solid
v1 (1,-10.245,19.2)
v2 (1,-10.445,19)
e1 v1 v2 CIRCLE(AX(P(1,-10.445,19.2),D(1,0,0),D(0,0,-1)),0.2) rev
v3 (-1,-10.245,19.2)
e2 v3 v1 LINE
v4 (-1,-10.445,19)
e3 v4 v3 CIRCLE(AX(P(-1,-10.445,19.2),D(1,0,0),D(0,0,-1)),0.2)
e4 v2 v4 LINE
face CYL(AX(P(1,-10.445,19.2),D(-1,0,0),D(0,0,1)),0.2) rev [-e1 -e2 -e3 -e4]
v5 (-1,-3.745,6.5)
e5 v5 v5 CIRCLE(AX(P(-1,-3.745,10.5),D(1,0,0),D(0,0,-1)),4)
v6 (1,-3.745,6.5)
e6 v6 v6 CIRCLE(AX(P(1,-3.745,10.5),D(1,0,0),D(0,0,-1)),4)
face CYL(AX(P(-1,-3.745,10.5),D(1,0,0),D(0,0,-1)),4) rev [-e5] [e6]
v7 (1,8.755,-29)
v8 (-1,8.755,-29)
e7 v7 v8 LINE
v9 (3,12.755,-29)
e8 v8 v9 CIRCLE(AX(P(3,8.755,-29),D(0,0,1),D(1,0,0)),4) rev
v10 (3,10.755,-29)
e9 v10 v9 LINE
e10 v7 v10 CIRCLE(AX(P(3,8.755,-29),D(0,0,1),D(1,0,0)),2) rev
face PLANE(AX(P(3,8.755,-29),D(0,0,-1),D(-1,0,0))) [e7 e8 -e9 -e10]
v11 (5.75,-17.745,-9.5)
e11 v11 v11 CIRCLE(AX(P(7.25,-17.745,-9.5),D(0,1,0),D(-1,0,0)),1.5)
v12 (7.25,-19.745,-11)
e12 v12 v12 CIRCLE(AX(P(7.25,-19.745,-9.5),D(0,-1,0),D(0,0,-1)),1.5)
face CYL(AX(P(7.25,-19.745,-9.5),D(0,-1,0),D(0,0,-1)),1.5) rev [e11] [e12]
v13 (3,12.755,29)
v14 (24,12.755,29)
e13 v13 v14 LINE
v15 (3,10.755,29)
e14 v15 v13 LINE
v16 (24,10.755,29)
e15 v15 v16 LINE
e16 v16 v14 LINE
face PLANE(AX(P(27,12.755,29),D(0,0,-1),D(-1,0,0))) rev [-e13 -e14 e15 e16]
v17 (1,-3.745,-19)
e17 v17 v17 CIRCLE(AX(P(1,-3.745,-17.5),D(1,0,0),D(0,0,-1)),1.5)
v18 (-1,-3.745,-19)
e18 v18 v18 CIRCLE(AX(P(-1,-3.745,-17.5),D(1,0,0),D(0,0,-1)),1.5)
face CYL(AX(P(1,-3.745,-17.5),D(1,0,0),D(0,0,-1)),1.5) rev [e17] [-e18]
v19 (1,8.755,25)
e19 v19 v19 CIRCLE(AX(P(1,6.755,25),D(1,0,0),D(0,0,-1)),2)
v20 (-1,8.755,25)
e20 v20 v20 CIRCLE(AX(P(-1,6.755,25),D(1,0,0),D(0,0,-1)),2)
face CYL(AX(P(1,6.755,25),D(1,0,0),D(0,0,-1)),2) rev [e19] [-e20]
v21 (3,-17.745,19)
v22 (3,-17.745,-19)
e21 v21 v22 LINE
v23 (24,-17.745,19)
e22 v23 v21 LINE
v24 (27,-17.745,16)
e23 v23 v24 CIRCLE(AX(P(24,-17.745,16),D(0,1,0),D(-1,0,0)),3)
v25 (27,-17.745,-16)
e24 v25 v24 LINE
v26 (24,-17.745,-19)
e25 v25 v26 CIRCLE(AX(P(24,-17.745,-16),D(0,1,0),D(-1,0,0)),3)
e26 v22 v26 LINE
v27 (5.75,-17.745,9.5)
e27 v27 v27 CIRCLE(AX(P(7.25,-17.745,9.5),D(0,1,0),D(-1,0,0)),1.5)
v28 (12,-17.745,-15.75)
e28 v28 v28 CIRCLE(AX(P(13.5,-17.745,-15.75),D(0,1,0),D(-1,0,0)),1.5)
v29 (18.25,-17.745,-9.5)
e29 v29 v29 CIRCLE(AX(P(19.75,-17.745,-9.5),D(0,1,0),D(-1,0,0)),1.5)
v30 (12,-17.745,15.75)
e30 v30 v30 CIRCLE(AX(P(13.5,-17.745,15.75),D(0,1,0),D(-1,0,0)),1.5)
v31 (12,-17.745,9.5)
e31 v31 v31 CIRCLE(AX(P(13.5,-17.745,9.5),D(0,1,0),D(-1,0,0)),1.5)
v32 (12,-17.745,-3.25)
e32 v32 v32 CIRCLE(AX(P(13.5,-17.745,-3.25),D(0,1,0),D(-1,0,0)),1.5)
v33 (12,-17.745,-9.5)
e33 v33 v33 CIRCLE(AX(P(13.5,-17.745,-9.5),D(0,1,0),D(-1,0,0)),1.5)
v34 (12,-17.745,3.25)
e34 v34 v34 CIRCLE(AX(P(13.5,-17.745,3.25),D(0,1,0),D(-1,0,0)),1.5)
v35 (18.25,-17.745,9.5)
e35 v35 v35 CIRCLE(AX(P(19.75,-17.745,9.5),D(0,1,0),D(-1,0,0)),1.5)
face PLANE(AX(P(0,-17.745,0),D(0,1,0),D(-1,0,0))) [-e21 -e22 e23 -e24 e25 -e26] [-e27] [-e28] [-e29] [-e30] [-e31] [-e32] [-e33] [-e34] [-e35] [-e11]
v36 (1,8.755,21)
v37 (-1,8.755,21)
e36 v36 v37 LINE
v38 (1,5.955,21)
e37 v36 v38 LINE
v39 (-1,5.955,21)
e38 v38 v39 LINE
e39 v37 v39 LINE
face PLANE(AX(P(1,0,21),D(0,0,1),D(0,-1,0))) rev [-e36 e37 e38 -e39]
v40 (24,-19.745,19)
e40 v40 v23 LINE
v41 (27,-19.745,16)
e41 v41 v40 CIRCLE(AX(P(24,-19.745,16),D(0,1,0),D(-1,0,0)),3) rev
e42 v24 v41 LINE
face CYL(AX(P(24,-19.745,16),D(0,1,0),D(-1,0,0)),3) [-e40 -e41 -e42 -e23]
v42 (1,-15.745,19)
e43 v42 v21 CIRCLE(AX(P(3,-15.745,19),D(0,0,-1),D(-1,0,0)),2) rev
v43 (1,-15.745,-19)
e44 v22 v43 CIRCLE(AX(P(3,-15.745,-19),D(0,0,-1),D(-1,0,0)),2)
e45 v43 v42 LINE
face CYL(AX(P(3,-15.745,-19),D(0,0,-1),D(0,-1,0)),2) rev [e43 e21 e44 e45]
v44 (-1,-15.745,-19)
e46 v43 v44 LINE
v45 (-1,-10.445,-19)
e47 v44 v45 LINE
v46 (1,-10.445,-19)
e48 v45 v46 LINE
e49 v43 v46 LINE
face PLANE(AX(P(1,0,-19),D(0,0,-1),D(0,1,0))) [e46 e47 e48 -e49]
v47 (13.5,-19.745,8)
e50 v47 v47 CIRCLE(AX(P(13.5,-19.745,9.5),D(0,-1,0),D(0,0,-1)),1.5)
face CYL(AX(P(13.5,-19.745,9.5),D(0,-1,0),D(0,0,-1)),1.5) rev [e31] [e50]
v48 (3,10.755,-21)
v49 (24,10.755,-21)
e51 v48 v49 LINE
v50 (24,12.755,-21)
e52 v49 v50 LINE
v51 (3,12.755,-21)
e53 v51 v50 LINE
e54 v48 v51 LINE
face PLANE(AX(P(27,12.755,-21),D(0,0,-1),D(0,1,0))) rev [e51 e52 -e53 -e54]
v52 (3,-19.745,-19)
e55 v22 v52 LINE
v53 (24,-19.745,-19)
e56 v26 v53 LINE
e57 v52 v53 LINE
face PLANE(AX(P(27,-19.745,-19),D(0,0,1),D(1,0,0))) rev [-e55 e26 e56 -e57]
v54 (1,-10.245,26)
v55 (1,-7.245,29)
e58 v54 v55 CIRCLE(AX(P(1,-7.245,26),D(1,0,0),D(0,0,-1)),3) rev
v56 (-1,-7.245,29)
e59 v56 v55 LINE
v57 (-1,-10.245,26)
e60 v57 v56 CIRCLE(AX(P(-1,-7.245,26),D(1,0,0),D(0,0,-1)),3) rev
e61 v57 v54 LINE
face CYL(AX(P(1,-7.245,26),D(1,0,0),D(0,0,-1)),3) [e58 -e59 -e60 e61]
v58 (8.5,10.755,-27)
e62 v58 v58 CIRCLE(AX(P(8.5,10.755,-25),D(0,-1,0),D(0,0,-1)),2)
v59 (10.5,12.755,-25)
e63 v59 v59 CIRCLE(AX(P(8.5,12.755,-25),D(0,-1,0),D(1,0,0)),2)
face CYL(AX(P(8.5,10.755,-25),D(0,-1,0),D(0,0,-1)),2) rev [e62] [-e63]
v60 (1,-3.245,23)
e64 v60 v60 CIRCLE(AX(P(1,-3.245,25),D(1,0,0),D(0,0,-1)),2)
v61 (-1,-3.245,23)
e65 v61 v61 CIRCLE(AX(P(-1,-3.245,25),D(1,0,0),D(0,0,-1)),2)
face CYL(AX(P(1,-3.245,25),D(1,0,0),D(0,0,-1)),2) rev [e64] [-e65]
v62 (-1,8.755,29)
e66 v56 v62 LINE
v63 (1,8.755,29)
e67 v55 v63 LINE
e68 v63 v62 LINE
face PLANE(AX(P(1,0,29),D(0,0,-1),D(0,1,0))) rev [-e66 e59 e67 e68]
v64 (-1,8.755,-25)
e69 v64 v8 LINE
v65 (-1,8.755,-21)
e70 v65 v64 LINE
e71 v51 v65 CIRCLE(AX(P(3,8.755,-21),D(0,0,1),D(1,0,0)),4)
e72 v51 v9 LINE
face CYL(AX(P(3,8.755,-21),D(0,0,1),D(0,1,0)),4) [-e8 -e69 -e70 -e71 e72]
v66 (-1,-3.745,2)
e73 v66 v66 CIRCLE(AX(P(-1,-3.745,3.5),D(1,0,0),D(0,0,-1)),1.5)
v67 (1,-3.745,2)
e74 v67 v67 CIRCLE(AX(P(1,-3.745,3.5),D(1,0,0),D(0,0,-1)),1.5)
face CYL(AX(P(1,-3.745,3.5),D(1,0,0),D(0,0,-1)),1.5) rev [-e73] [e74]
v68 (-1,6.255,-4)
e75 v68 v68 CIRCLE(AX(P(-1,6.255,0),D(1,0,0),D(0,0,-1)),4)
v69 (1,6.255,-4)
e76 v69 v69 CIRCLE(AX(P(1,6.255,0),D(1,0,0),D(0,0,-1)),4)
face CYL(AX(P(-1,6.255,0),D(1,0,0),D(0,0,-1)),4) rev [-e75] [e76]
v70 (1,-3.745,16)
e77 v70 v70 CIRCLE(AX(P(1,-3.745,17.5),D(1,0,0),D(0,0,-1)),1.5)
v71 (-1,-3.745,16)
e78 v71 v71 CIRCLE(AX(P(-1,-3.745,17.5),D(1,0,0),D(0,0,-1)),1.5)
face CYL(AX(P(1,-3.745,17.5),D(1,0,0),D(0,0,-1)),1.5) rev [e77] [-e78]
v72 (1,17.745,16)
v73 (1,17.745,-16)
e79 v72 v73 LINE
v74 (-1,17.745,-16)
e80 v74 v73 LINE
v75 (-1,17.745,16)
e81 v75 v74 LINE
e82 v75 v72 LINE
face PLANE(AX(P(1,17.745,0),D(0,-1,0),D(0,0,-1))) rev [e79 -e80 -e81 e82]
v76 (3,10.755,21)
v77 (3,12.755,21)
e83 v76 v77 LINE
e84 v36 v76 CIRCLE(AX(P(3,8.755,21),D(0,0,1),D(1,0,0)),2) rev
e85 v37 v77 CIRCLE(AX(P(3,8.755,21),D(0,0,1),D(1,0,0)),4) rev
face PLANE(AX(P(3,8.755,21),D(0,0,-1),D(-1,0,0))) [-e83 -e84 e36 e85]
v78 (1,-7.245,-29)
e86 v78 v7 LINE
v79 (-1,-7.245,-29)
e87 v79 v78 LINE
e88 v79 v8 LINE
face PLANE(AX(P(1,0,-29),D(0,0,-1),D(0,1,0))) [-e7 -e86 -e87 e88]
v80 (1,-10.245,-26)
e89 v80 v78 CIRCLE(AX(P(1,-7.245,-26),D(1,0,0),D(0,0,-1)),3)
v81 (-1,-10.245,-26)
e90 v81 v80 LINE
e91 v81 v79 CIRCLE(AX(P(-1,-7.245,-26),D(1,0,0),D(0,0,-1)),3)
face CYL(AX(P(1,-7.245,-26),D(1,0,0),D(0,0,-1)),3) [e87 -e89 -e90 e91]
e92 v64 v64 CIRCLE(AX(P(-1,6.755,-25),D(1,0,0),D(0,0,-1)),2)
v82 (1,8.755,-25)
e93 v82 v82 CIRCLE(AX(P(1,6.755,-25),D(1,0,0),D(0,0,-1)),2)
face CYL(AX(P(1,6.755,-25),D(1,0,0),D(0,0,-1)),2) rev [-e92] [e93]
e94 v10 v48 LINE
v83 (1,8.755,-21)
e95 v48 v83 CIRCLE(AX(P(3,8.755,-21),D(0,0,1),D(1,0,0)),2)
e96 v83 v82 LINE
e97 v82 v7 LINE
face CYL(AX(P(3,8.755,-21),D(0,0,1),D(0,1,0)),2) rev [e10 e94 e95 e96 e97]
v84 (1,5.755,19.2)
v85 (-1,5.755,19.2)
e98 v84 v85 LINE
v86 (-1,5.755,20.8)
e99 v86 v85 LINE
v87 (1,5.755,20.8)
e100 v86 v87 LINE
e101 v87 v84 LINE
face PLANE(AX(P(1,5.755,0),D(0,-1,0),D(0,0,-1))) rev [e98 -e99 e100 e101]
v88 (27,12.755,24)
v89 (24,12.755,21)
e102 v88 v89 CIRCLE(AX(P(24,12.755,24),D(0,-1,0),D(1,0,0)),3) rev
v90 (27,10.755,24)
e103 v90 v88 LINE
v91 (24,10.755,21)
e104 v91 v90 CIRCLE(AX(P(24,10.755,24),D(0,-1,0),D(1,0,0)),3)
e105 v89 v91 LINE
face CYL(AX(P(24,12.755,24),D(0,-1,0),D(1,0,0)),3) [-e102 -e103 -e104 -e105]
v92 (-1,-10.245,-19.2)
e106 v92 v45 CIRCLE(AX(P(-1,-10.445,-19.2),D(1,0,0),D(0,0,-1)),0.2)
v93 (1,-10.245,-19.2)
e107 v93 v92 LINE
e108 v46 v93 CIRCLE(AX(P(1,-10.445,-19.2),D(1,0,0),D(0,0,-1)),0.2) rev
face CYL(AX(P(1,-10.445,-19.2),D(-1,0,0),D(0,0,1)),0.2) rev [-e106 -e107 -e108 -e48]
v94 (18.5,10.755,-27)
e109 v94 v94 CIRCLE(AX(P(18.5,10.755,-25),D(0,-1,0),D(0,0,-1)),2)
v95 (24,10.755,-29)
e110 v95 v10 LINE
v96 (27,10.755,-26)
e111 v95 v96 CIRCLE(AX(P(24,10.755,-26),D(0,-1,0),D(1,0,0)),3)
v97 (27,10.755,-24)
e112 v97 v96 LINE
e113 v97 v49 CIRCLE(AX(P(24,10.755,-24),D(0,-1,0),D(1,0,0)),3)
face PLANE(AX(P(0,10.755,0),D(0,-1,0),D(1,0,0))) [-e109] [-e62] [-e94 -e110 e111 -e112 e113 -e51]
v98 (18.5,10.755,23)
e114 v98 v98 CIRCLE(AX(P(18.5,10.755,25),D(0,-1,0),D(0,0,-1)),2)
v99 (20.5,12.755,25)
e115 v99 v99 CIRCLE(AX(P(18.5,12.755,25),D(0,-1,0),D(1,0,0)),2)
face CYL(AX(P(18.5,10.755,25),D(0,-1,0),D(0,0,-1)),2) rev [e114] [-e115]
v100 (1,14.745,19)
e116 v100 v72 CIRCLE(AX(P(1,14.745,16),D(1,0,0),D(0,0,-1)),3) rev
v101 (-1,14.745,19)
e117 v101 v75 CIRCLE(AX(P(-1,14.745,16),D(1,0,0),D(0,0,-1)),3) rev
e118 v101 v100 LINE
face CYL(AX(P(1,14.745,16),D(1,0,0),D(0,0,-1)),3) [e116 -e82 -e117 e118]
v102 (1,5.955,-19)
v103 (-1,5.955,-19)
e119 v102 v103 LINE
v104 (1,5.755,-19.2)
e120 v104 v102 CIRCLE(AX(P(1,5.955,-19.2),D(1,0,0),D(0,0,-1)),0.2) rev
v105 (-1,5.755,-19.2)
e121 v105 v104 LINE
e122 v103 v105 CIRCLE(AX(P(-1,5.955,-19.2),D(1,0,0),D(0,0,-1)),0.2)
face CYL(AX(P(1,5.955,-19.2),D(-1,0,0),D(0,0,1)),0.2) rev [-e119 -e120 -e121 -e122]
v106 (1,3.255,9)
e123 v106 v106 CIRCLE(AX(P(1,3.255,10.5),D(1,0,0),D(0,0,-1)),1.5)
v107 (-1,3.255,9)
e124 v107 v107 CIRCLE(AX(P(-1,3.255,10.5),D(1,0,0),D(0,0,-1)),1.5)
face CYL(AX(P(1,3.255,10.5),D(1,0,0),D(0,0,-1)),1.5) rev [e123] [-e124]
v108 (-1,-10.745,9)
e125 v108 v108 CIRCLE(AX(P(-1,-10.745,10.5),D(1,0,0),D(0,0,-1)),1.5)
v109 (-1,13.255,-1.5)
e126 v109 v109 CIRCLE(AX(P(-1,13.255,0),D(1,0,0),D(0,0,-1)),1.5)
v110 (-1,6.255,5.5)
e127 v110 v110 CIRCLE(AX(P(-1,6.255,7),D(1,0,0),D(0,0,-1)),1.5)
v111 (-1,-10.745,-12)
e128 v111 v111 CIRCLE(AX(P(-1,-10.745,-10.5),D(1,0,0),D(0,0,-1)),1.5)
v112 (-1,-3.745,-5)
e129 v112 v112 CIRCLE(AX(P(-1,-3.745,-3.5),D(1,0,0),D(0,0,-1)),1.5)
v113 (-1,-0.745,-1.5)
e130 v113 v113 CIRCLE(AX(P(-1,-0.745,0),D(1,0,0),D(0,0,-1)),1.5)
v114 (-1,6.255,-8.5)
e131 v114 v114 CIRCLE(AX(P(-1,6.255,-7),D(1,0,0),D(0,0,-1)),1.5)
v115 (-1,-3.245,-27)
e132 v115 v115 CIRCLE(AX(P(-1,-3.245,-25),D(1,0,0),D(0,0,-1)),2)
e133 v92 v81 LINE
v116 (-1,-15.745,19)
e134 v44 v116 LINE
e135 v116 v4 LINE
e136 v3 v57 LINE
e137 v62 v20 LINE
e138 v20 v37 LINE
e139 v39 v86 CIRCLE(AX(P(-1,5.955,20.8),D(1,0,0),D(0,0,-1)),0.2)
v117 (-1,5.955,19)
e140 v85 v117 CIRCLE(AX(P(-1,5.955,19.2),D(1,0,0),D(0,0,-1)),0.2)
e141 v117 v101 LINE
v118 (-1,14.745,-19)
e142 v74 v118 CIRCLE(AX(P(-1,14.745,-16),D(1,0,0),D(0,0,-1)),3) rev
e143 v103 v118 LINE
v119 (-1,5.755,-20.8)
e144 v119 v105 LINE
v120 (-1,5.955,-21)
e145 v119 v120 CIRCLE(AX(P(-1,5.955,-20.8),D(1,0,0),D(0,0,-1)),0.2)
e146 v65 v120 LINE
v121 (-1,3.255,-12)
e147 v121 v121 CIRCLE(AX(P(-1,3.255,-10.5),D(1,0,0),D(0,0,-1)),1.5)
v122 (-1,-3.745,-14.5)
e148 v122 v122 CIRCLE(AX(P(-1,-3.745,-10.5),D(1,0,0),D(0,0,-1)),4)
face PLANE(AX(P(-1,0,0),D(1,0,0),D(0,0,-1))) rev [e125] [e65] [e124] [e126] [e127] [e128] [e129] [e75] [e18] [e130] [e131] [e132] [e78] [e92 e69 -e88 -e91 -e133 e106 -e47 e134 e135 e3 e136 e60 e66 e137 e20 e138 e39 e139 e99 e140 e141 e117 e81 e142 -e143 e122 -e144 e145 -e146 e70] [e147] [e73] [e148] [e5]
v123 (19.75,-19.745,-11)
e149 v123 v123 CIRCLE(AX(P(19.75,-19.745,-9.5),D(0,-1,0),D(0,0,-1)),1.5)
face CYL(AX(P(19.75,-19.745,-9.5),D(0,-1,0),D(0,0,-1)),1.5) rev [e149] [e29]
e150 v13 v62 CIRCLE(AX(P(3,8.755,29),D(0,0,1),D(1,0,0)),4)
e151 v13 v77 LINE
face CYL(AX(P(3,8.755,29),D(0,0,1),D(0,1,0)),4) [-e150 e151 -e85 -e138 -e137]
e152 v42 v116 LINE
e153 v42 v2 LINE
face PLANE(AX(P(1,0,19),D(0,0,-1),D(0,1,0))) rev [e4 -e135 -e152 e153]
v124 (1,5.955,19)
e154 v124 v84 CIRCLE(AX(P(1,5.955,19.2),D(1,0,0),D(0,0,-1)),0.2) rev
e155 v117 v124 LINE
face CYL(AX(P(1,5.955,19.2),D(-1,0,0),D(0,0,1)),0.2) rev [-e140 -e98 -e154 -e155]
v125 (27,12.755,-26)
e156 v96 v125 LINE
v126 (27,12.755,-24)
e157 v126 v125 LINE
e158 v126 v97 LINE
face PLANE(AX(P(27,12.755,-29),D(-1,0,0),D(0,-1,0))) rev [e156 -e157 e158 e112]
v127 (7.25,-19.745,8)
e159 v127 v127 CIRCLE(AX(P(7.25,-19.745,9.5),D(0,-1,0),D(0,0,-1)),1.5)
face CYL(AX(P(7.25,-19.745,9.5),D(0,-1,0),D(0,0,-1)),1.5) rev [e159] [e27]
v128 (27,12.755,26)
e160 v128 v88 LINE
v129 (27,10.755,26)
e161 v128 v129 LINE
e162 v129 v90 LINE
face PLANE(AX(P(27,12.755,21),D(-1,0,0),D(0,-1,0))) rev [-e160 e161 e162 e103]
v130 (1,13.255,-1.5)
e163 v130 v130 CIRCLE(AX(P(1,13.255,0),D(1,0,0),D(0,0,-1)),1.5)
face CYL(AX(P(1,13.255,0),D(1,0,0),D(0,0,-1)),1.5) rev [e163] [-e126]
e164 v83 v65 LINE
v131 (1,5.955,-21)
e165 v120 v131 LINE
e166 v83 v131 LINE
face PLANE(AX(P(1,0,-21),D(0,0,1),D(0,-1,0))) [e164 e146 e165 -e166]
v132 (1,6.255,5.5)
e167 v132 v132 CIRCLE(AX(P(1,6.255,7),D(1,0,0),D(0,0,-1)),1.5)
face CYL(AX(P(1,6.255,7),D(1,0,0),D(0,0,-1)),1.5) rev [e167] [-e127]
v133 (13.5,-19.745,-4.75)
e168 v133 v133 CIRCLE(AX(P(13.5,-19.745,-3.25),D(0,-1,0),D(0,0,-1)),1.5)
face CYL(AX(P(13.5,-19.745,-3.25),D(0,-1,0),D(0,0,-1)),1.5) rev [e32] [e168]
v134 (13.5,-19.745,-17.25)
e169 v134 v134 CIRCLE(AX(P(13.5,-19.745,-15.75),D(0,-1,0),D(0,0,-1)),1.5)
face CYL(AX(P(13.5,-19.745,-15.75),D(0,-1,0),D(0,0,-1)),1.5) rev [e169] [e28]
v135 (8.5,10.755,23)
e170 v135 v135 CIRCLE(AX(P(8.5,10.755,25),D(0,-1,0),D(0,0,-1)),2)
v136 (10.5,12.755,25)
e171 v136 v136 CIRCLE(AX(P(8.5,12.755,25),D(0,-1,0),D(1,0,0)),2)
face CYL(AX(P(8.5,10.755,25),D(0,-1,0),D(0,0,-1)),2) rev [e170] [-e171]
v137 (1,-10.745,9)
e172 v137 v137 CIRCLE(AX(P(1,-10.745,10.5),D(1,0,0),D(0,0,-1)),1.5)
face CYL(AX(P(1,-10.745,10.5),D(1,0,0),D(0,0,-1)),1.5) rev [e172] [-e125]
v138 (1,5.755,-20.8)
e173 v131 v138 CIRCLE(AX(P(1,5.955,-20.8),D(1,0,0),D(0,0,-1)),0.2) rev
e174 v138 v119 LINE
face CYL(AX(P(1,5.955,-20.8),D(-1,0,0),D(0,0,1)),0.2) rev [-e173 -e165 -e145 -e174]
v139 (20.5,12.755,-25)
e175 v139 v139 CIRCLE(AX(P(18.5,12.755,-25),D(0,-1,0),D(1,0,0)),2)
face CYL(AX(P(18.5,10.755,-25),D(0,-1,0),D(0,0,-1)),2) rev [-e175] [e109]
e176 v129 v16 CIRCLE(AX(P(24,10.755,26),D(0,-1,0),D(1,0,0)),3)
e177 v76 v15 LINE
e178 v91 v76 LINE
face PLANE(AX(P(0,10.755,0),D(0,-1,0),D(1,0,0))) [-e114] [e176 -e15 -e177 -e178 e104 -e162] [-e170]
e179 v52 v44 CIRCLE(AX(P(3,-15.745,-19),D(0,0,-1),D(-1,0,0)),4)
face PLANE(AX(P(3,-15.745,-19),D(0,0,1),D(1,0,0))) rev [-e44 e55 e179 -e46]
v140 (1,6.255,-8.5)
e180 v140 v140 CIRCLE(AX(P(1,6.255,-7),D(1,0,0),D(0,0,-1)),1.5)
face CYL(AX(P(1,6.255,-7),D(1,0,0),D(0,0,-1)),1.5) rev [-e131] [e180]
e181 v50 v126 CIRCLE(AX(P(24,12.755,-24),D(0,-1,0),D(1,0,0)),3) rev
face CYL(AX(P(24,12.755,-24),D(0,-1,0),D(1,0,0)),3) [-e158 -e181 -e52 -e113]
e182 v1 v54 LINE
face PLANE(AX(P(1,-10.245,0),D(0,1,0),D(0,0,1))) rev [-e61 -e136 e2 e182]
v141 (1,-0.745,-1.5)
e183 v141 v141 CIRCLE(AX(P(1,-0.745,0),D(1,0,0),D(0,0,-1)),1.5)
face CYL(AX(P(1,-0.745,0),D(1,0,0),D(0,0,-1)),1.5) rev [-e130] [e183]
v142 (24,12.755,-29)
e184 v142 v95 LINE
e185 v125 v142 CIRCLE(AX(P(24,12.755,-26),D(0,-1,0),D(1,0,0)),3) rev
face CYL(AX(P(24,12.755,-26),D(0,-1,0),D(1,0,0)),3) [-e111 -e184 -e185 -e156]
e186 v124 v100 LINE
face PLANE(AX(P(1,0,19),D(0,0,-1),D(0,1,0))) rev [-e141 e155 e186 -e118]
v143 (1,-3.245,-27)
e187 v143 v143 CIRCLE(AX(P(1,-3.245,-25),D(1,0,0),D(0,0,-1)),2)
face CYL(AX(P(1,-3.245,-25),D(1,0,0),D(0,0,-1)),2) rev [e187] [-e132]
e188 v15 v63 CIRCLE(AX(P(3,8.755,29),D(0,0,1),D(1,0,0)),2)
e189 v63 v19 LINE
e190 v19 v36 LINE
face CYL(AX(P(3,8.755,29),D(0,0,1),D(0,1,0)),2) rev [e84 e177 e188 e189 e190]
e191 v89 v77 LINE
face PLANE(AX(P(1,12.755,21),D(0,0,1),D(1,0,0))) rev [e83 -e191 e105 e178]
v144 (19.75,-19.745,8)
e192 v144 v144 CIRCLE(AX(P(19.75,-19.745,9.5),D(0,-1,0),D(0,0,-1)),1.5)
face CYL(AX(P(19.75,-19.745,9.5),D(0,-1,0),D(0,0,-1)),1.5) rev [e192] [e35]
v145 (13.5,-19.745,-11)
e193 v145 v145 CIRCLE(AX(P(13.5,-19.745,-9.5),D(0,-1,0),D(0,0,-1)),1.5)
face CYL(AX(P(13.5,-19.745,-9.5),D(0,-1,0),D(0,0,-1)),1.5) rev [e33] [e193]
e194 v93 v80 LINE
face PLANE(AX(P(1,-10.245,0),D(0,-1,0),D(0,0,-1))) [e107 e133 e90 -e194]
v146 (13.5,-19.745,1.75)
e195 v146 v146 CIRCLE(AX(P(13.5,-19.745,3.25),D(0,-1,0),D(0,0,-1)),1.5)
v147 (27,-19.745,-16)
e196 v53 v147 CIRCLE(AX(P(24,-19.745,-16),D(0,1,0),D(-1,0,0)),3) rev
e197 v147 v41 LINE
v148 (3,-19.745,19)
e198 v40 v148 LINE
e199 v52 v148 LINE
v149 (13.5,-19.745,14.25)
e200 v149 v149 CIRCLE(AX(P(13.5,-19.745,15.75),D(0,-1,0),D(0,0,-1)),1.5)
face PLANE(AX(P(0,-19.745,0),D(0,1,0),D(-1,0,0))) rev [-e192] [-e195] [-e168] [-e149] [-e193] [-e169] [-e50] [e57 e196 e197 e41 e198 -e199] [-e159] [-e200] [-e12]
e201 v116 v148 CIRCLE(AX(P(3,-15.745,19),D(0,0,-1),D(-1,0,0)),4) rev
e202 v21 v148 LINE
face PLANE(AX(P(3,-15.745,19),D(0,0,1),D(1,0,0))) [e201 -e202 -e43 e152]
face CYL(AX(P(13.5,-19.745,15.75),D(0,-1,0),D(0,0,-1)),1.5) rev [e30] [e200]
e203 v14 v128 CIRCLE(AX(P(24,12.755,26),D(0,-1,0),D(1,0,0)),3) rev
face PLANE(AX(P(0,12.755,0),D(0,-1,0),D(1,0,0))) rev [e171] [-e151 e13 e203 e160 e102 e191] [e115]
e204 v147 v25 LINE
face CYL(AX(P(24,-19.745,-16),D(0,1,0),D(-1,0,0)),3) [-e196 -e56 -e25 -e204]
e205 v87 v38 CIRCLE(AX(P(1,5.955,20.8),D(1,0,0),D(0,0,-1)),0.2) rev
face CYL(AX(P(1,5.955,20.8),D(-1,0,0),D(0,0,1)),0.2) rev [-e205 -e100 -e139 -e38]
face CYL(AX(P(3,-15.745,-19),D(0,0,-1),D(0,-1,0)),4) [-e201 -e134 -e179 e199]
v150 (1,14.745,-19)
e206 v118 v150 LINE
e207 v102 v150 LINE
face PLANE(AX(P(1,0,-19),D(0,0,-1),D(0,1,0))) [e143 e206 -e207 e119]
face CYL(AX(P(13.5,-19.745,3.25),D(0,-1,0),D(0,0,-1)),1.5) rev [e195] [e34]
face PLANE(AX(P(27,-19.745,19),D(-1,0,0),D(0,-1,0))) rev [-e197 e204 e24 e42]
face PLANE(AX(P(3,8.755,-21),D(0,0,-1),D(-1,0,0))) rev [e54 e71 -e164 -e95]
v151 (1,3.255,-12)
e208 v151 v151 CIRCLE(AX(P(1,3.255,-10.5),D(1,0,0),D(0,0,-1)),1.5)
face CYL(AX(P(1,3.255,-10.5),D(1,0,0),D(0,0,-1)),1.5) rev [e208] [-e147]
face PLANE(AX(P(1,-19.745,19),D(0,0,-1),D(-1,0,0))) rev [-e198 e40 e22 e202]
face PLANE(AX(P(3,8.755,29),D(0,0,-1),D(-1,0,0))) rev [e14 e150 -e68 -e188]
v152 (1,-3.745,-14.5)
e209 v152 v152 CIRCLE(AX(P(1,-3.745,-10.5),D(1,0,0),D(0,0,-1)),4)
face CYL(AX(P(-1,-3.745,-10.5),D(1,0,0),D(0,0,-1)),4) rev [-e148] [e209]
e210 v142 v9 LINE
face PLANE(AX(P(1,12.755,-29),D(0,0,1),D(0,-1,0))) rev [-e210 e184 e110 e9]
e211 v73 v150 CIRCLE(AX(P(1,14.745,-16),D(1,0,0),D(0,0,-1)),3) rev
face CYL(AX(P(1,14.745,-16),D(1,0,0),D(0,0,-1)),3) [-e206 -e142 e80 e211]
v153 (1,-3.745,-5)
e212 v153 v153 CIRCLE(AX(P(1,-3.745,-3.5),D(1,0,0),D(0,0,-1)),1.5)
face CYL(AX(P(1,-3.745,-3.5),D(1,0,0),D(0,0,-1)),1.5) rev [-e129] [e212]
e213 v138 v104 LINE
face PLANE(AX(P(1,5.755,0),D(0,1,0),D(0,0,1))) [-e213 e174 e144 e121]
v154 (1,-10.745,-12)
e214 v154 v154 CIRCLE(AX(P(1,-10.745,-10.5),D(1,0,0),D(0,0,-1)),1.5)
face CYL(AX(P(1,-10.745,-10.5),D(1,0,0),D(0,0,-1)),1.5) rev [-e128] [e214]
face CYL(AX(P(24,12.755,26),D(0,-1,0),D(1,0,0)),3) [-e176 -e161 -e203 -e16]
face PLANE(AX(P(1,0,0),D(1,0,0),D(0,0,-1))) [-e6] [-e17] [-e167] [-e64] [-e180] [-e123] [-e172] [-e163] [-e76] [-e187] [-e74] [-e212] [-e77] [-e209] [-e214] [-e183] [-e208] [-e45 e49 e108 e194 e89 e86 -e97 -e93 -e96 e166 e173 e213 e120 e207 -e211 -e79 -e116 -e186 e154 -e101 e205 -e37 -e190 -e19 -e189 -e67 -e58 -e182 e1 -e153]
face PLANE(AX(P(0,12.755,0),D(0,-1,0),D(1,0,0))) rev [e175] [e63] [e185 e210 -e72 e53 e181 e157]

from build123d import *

# Parameters (mm, degrees)
BOSS_EXTRUDE1_DEPTH            = 1
CONVERT_SOLID1_START           = -1
CONVERT_SOLID1_DEPTH           = 1
EDGE_FLANGE1_STRIP_W           = 12
EDGE_FLANGE1_STRIP_H           = 2
EDGE_FLANGE1_STRIP_CUT_DEPTH   = 38
EDGE_FLANGE1_DEPTH             = 38
EDGE_FLANGE2_STRIP_W           = 12
EDGE_FLANGE2_STRIP_H           = 2
EDGE_FLANGE2_STRIP_CUT_DEPTH   = 8
EDGE_FLANGE2_STRIP_2_W         = 12
EDGE_FLANGE2_STRIP_2_H         = 2
EDGE_FLANGE2_STRIP_CUT_2_DEPTH = 8
EDGE_FLANGE2_DEPTH             = 8
EDGE_FLANGE2_BEND_DEPTH        = 8
FILLET1_R                      = 3
M3X0_5_TAPPED_HOLE1_D          = 3
SKETCH20_R                     = 4
CUT_EXTRUDE1_DEPTH             = 44.667665669
M4X0_7_TAPPED_HOLE1_D          = 4
M4X0_7_TAPPED_HOLE2_D          = 4
M3X0_5_TAPPED_HOLE2_D          = 3
FILLET2_R                      = 0.2


# Read off the part's stored shape, not the designer's step: Convert-Solid1
# Sheet-metal steps are written as plain solids
with BuildPart() as part:
    # Sketch1 → Boss-Extrude1 (new body)
    with BuildSketch(Plane(origin=(0, 0, 0), x_dir=(0, 0, -1), z_dir=(1, 0, 0))):
        with BuildLine():
            Line((-19, -17.745), (19, -17.745))
            Line((19, -17.745), (19, -10.245))
            Line((19, -10.245), (26, -10.245))
            ThreePointArc((26, -10.245), (28.121320344, -9.366320344), (29, -7.245))
            Line((29, -7.245), (29, 10.755))
            Line((29, 10.755), (21, 10.755))
            Line((21, 10.755), (21, 5.755))
            Line((21, 5.755), (19, 5.755))
            Line((19, 5.755), (19, 14.745))
            ThreePointArc((19, 14.745), (18.121320344, 16.866320344), (16, 17.745))
            Line((16, 17.745), (-16, 17.745))
            ThreePointArc((-16, 17.745), (-18.121320344, 16.866320344), (-19, 14.745))
            Line((-19, 14.745), (-19, 5.755))
            Line((-19, 5.755), (-21, 5.755))
            Line((-21, 5.755), (-21, 10.755))
            Line((-21, 10.755), (-29, 10.755))
            Line((-29, 10.755), (-29, -7.245))
            ThreePointArc((-29, -7.245), (-28.121320344, -9.366320344), (-26, -10.245))
            Line((-26, -10.245), (-19, -10.245))
            Line((-19, -10.245), (-19, -17.745))
        make_face()
    extrude(amount=BOSS_EXTRUDE1_DEPTH)

    # Convert-Solid1 outline → Convert-Solid1 (add)
    with BuildSketch(Plane.YZ.offset(CONVERT_SOLID1_START)):
        with BuildLine():
            Line((17.745, -16), (17.745, 16))
            ThreePointArc((17.745, 16), (16.866320344, 18.121320344), (14.745, 19))
            Line((14.745, 19), (5.755, 19))
            Line((5.755, 19), (5.755, 21))
            Line((5.755, 21), (10.755, 21))
            Line((10.755, 21), (10.755, 29))
            Line((10.755, 29), (-7.245, 29))
            ThreePointArc((-7.245, 29), (-9.366320344, 28.121320344), (-10.245, 26))
            Line((-10.245, 26), (-10.245, 19))
            Line((-10.245, 19), (-17.745, 19))
            Line((-17.745, 19), (-17.745, -19))
            Line((-17.745, -19), (-10.245, -19))
            Line((-10.245, -19), (-10.245, -26))
            ThreePointArc((-10.245, -26), (-9.366320344, -28.121320344), (-7.245, -29))
            Line((-7.245, -29), (10.755, -29))
            Line((10.755, -29), (10.755, -21))
            Line((10.755, -21), (5.755, -21))
            Line((5.755, -21), (5.755, -19))
            Line((5.755, -19), (14.745, -19))
            ThreePointArc((14.745, -19), (16.866320344, -18.121320344), (17.745, -16))
        make_face()
    extrude(amount=CONVERT_SOLID1_DEPTH)

    # Edge-Flange1 strip (across the edge) → Edge-Flange1 strip cut (cut)
    with BuildSketch(Plane(origin=(1, -17.745, 19), x_dir=(0, 1, 0), z_dir=(0, 0, -1))):
        with Locations((-4, -1)):
            Rectangle(EDGE_FLANGE1_STRIP_W, EDGE_FLANGE1_STRIP_H)
    extrude(amount=EDGE_FLANGE1_STRIP_CUT_DEPTH, mode=Mode.SUBTRACT)

    # Edge-Flange1 section (across the edge) → Edge-Flange1 (add)
    with BuildSketch(Plane(origin=(1, -17.745, 19), x_dir=(0, 1, 0), z_dir=(0, 0, -1))):
        with BuildLine():
            Line((-2, 2), (-2, 26))
            Line((-2, 26), (0, 26))
            Line((0, 26), (0, 2))
            ThreePointArc((0, 2), (0.585786438, 0.585786438), (2, 0))
            Line((2, 0), (2, -2))
            ThreePointArc((2, -2), (-0.828427125, -0.828427125), (-2, 2))
        make_face()
    extrude(amount=EDGE_FLANGE1_DEPTH)

    # Edge-Flange2 strip (across the edge) → Edge-Flange2 strip cut (cut)
    with BuildSketch(Plane(origin=(1, 10.755, 21), x_dir=(0, -1, 0), z_dir=(0, 0, 1))):
        with Locations((-4, -1)):
            Rectangle(EDGE_FLANGE2_STRIP_W, EDGE_FLANGE2_STRIP_H)
    extrude(amount=EDGE_FLANGE2_STRIP_CUT_DEPTH, mode=Mode.SUBTRACT)

    # Edge-Flange2 strip 2 (across the edge) → Edge-Flange2 strip cut 2 (cut)
    with BuildSketch(Plane(origin=(1, 10.755, -29), x_dir=(0, -1, 0), z_dir=(0, 0, 1))):
        with Locations((-4, -1)):
            Rectangle(EDGE_FLANGE2_STRIP_2_W, EDGE_FLANGE2_STRIP_2_H)
    extrude(amount=EDGE_FLANGE2_STRIP_CUT_2_DEPTH, mode=Mode.SUBTRACT)

    # Edge-Flange2 section (across the edge) → Edge-Flange2 (add)
    with BuildSketch(Plane(origin=(1, 10.755, 21), x_dir=(0, -1, 0), z_dir=(0, 0, 1))):
        with BuildLine():
            Line((-2, 2), (-2, 26))
            Line((-2, 26), (0, 26))
            Line((0, 26), (0, 2))
            ThreePointArc((0, 2), (0.585786438, 0.585786438), (2, 0))
            Line((2, 0), (2, -2))
            ThreePointArc((2, -2), (-0.828427125, -0.828427125), (-2, 2))
        make_face()
    extrude(amount=EDGE_FLANGE2_DEPTH)

    # Edge-Flange2 section 2 (across the edge) → Edge-Flange2 bend (add)
    with BuildSketch(Plane(origin=(1, 10.755, -29), x_dir=(0, -1, 0), z_dir=(0, 0, 1))):
        with BuildLine():
            Line((-2, 2), (-2, 26))
            Line((-2, 26), (0, 26))
            Line((0, 26), (0, 2))
            ThreePointArc((0, 2), (0.585786438, 0.585786438), (2, 0))
            Line((2, 0), (2, -2))
            ThreePointArc((2, -2), (-0.828427125, -0.828427125), (-2, 2))
        make_face()
    extrude(amount=EDGE_FLANGE2_BEND_DEPTH)

    # Fillet1
    fillet1_edges = [part.edges().sort_by_distance(p)[0] for p in [
        (27, 11.755, 21),
        (27, 11.755, 29),
        (27, 11.755, -29),
        (27, 11.755, -21),
        (27, -18.745, 19),
        (27, -18.745, -19),
    ]]
    fillet(fillet1_edges, radius=FILLET1_R)

    # M3x0.5 Tapped Hole1 (through all)
    with Locations(Plane(origin=(0, -19.745, 0), x_dir=(-1, 0, 0), z_dir=(0, -1, 0))):
        with Locations((-19.75, -9.5), (-7.25, -9.5), (-13.5, -9.5), (-13.5, -3.25), (-13.5, -15.75), (-7.25, 9.5), (-13.5, 3.25), (-19.75, 9.5), (-13.5, 9.5), (-13.5, 15.75)):
            Hole(M3X0_5_TAPPED_HOLE1_D / 2)

    # Sketch20 → Cut-Extrude1 (cut, through all)
    with BuildSketch(Plane(origin=(1, 0, 0), x_dir=(0, 0, -1), z_dir=(1, 0, 0))):
        with Locations((10.5, -3.745)):
            Circle(SKETCH20_R)
        with Locations((0, 6.255)):
            Circle(SKETCH20_R)
        with Locations((-10.5, -3.745)):
            Circle(SKETCH20_R)
    extrude(amount=-CUT_EXTRUDE1_DEPTH, mode=Mode.SUBTRACT)

    # M4x0.7 Tapped Hole1 (through all)
    with Locations(Plane(origin=(0, 10.755, 0), x_dir=(-1, 0, 0), z_dir=(0, -1, 0))):
        with Locations((-18.5, -25), (-8.5, -25), (-8.5, 25), (-18.5, 25)):
            Hole(M4X0_7_TAPPED_HOLE1_D / 2)

    # M4x0.7 Tapped Hole2 (through all)
    with Locations(Plane(origin=(1, 0, 0), x_dir=(0, 0, -1), z_dir=(1, 0, 0))):
        with Locations((25, -3.245), (25, 6.755), (-25, 6.755), (-25, -3.245)):
            Hole(M4X0_7_TAPPED_HOLE2_D / 2)

    # M3x0.5 Tapped Hole2 (through all)
    with Locations(Plane(origin=(1, 0, 0), x_dir=(0, 0, -1), z_dir=(1, 0, 0))):
        with Locations((-10.5, 3.255), (-10.5, -10.745), (-3.5, -3.745), (-17.5, -3.745), (0, 13.255), (0, -0.745), (7, 6.255), (-7, 6.255), (10.5, 3.255), (10.5, -10.745), (17.5, -3.745), (3.5, -3.745)):
            Hole(M3X0_5_TAPPED_HOLE2_D / 2)

    # Fillet2
    fillet2_edges = [part.edges().sort_by_distance(p)[0] for p in [
        (0, 5.755, -19),
        (0, 5.755, -21),
        (0, -10.245, -19),
        (0, -10.245, 19),
        (0, 5.755, 21),
        (0, 5.755, 19),
    ]]
    fillet(fillet2_edges, radius=FILLET2_R)


solid = part.part
